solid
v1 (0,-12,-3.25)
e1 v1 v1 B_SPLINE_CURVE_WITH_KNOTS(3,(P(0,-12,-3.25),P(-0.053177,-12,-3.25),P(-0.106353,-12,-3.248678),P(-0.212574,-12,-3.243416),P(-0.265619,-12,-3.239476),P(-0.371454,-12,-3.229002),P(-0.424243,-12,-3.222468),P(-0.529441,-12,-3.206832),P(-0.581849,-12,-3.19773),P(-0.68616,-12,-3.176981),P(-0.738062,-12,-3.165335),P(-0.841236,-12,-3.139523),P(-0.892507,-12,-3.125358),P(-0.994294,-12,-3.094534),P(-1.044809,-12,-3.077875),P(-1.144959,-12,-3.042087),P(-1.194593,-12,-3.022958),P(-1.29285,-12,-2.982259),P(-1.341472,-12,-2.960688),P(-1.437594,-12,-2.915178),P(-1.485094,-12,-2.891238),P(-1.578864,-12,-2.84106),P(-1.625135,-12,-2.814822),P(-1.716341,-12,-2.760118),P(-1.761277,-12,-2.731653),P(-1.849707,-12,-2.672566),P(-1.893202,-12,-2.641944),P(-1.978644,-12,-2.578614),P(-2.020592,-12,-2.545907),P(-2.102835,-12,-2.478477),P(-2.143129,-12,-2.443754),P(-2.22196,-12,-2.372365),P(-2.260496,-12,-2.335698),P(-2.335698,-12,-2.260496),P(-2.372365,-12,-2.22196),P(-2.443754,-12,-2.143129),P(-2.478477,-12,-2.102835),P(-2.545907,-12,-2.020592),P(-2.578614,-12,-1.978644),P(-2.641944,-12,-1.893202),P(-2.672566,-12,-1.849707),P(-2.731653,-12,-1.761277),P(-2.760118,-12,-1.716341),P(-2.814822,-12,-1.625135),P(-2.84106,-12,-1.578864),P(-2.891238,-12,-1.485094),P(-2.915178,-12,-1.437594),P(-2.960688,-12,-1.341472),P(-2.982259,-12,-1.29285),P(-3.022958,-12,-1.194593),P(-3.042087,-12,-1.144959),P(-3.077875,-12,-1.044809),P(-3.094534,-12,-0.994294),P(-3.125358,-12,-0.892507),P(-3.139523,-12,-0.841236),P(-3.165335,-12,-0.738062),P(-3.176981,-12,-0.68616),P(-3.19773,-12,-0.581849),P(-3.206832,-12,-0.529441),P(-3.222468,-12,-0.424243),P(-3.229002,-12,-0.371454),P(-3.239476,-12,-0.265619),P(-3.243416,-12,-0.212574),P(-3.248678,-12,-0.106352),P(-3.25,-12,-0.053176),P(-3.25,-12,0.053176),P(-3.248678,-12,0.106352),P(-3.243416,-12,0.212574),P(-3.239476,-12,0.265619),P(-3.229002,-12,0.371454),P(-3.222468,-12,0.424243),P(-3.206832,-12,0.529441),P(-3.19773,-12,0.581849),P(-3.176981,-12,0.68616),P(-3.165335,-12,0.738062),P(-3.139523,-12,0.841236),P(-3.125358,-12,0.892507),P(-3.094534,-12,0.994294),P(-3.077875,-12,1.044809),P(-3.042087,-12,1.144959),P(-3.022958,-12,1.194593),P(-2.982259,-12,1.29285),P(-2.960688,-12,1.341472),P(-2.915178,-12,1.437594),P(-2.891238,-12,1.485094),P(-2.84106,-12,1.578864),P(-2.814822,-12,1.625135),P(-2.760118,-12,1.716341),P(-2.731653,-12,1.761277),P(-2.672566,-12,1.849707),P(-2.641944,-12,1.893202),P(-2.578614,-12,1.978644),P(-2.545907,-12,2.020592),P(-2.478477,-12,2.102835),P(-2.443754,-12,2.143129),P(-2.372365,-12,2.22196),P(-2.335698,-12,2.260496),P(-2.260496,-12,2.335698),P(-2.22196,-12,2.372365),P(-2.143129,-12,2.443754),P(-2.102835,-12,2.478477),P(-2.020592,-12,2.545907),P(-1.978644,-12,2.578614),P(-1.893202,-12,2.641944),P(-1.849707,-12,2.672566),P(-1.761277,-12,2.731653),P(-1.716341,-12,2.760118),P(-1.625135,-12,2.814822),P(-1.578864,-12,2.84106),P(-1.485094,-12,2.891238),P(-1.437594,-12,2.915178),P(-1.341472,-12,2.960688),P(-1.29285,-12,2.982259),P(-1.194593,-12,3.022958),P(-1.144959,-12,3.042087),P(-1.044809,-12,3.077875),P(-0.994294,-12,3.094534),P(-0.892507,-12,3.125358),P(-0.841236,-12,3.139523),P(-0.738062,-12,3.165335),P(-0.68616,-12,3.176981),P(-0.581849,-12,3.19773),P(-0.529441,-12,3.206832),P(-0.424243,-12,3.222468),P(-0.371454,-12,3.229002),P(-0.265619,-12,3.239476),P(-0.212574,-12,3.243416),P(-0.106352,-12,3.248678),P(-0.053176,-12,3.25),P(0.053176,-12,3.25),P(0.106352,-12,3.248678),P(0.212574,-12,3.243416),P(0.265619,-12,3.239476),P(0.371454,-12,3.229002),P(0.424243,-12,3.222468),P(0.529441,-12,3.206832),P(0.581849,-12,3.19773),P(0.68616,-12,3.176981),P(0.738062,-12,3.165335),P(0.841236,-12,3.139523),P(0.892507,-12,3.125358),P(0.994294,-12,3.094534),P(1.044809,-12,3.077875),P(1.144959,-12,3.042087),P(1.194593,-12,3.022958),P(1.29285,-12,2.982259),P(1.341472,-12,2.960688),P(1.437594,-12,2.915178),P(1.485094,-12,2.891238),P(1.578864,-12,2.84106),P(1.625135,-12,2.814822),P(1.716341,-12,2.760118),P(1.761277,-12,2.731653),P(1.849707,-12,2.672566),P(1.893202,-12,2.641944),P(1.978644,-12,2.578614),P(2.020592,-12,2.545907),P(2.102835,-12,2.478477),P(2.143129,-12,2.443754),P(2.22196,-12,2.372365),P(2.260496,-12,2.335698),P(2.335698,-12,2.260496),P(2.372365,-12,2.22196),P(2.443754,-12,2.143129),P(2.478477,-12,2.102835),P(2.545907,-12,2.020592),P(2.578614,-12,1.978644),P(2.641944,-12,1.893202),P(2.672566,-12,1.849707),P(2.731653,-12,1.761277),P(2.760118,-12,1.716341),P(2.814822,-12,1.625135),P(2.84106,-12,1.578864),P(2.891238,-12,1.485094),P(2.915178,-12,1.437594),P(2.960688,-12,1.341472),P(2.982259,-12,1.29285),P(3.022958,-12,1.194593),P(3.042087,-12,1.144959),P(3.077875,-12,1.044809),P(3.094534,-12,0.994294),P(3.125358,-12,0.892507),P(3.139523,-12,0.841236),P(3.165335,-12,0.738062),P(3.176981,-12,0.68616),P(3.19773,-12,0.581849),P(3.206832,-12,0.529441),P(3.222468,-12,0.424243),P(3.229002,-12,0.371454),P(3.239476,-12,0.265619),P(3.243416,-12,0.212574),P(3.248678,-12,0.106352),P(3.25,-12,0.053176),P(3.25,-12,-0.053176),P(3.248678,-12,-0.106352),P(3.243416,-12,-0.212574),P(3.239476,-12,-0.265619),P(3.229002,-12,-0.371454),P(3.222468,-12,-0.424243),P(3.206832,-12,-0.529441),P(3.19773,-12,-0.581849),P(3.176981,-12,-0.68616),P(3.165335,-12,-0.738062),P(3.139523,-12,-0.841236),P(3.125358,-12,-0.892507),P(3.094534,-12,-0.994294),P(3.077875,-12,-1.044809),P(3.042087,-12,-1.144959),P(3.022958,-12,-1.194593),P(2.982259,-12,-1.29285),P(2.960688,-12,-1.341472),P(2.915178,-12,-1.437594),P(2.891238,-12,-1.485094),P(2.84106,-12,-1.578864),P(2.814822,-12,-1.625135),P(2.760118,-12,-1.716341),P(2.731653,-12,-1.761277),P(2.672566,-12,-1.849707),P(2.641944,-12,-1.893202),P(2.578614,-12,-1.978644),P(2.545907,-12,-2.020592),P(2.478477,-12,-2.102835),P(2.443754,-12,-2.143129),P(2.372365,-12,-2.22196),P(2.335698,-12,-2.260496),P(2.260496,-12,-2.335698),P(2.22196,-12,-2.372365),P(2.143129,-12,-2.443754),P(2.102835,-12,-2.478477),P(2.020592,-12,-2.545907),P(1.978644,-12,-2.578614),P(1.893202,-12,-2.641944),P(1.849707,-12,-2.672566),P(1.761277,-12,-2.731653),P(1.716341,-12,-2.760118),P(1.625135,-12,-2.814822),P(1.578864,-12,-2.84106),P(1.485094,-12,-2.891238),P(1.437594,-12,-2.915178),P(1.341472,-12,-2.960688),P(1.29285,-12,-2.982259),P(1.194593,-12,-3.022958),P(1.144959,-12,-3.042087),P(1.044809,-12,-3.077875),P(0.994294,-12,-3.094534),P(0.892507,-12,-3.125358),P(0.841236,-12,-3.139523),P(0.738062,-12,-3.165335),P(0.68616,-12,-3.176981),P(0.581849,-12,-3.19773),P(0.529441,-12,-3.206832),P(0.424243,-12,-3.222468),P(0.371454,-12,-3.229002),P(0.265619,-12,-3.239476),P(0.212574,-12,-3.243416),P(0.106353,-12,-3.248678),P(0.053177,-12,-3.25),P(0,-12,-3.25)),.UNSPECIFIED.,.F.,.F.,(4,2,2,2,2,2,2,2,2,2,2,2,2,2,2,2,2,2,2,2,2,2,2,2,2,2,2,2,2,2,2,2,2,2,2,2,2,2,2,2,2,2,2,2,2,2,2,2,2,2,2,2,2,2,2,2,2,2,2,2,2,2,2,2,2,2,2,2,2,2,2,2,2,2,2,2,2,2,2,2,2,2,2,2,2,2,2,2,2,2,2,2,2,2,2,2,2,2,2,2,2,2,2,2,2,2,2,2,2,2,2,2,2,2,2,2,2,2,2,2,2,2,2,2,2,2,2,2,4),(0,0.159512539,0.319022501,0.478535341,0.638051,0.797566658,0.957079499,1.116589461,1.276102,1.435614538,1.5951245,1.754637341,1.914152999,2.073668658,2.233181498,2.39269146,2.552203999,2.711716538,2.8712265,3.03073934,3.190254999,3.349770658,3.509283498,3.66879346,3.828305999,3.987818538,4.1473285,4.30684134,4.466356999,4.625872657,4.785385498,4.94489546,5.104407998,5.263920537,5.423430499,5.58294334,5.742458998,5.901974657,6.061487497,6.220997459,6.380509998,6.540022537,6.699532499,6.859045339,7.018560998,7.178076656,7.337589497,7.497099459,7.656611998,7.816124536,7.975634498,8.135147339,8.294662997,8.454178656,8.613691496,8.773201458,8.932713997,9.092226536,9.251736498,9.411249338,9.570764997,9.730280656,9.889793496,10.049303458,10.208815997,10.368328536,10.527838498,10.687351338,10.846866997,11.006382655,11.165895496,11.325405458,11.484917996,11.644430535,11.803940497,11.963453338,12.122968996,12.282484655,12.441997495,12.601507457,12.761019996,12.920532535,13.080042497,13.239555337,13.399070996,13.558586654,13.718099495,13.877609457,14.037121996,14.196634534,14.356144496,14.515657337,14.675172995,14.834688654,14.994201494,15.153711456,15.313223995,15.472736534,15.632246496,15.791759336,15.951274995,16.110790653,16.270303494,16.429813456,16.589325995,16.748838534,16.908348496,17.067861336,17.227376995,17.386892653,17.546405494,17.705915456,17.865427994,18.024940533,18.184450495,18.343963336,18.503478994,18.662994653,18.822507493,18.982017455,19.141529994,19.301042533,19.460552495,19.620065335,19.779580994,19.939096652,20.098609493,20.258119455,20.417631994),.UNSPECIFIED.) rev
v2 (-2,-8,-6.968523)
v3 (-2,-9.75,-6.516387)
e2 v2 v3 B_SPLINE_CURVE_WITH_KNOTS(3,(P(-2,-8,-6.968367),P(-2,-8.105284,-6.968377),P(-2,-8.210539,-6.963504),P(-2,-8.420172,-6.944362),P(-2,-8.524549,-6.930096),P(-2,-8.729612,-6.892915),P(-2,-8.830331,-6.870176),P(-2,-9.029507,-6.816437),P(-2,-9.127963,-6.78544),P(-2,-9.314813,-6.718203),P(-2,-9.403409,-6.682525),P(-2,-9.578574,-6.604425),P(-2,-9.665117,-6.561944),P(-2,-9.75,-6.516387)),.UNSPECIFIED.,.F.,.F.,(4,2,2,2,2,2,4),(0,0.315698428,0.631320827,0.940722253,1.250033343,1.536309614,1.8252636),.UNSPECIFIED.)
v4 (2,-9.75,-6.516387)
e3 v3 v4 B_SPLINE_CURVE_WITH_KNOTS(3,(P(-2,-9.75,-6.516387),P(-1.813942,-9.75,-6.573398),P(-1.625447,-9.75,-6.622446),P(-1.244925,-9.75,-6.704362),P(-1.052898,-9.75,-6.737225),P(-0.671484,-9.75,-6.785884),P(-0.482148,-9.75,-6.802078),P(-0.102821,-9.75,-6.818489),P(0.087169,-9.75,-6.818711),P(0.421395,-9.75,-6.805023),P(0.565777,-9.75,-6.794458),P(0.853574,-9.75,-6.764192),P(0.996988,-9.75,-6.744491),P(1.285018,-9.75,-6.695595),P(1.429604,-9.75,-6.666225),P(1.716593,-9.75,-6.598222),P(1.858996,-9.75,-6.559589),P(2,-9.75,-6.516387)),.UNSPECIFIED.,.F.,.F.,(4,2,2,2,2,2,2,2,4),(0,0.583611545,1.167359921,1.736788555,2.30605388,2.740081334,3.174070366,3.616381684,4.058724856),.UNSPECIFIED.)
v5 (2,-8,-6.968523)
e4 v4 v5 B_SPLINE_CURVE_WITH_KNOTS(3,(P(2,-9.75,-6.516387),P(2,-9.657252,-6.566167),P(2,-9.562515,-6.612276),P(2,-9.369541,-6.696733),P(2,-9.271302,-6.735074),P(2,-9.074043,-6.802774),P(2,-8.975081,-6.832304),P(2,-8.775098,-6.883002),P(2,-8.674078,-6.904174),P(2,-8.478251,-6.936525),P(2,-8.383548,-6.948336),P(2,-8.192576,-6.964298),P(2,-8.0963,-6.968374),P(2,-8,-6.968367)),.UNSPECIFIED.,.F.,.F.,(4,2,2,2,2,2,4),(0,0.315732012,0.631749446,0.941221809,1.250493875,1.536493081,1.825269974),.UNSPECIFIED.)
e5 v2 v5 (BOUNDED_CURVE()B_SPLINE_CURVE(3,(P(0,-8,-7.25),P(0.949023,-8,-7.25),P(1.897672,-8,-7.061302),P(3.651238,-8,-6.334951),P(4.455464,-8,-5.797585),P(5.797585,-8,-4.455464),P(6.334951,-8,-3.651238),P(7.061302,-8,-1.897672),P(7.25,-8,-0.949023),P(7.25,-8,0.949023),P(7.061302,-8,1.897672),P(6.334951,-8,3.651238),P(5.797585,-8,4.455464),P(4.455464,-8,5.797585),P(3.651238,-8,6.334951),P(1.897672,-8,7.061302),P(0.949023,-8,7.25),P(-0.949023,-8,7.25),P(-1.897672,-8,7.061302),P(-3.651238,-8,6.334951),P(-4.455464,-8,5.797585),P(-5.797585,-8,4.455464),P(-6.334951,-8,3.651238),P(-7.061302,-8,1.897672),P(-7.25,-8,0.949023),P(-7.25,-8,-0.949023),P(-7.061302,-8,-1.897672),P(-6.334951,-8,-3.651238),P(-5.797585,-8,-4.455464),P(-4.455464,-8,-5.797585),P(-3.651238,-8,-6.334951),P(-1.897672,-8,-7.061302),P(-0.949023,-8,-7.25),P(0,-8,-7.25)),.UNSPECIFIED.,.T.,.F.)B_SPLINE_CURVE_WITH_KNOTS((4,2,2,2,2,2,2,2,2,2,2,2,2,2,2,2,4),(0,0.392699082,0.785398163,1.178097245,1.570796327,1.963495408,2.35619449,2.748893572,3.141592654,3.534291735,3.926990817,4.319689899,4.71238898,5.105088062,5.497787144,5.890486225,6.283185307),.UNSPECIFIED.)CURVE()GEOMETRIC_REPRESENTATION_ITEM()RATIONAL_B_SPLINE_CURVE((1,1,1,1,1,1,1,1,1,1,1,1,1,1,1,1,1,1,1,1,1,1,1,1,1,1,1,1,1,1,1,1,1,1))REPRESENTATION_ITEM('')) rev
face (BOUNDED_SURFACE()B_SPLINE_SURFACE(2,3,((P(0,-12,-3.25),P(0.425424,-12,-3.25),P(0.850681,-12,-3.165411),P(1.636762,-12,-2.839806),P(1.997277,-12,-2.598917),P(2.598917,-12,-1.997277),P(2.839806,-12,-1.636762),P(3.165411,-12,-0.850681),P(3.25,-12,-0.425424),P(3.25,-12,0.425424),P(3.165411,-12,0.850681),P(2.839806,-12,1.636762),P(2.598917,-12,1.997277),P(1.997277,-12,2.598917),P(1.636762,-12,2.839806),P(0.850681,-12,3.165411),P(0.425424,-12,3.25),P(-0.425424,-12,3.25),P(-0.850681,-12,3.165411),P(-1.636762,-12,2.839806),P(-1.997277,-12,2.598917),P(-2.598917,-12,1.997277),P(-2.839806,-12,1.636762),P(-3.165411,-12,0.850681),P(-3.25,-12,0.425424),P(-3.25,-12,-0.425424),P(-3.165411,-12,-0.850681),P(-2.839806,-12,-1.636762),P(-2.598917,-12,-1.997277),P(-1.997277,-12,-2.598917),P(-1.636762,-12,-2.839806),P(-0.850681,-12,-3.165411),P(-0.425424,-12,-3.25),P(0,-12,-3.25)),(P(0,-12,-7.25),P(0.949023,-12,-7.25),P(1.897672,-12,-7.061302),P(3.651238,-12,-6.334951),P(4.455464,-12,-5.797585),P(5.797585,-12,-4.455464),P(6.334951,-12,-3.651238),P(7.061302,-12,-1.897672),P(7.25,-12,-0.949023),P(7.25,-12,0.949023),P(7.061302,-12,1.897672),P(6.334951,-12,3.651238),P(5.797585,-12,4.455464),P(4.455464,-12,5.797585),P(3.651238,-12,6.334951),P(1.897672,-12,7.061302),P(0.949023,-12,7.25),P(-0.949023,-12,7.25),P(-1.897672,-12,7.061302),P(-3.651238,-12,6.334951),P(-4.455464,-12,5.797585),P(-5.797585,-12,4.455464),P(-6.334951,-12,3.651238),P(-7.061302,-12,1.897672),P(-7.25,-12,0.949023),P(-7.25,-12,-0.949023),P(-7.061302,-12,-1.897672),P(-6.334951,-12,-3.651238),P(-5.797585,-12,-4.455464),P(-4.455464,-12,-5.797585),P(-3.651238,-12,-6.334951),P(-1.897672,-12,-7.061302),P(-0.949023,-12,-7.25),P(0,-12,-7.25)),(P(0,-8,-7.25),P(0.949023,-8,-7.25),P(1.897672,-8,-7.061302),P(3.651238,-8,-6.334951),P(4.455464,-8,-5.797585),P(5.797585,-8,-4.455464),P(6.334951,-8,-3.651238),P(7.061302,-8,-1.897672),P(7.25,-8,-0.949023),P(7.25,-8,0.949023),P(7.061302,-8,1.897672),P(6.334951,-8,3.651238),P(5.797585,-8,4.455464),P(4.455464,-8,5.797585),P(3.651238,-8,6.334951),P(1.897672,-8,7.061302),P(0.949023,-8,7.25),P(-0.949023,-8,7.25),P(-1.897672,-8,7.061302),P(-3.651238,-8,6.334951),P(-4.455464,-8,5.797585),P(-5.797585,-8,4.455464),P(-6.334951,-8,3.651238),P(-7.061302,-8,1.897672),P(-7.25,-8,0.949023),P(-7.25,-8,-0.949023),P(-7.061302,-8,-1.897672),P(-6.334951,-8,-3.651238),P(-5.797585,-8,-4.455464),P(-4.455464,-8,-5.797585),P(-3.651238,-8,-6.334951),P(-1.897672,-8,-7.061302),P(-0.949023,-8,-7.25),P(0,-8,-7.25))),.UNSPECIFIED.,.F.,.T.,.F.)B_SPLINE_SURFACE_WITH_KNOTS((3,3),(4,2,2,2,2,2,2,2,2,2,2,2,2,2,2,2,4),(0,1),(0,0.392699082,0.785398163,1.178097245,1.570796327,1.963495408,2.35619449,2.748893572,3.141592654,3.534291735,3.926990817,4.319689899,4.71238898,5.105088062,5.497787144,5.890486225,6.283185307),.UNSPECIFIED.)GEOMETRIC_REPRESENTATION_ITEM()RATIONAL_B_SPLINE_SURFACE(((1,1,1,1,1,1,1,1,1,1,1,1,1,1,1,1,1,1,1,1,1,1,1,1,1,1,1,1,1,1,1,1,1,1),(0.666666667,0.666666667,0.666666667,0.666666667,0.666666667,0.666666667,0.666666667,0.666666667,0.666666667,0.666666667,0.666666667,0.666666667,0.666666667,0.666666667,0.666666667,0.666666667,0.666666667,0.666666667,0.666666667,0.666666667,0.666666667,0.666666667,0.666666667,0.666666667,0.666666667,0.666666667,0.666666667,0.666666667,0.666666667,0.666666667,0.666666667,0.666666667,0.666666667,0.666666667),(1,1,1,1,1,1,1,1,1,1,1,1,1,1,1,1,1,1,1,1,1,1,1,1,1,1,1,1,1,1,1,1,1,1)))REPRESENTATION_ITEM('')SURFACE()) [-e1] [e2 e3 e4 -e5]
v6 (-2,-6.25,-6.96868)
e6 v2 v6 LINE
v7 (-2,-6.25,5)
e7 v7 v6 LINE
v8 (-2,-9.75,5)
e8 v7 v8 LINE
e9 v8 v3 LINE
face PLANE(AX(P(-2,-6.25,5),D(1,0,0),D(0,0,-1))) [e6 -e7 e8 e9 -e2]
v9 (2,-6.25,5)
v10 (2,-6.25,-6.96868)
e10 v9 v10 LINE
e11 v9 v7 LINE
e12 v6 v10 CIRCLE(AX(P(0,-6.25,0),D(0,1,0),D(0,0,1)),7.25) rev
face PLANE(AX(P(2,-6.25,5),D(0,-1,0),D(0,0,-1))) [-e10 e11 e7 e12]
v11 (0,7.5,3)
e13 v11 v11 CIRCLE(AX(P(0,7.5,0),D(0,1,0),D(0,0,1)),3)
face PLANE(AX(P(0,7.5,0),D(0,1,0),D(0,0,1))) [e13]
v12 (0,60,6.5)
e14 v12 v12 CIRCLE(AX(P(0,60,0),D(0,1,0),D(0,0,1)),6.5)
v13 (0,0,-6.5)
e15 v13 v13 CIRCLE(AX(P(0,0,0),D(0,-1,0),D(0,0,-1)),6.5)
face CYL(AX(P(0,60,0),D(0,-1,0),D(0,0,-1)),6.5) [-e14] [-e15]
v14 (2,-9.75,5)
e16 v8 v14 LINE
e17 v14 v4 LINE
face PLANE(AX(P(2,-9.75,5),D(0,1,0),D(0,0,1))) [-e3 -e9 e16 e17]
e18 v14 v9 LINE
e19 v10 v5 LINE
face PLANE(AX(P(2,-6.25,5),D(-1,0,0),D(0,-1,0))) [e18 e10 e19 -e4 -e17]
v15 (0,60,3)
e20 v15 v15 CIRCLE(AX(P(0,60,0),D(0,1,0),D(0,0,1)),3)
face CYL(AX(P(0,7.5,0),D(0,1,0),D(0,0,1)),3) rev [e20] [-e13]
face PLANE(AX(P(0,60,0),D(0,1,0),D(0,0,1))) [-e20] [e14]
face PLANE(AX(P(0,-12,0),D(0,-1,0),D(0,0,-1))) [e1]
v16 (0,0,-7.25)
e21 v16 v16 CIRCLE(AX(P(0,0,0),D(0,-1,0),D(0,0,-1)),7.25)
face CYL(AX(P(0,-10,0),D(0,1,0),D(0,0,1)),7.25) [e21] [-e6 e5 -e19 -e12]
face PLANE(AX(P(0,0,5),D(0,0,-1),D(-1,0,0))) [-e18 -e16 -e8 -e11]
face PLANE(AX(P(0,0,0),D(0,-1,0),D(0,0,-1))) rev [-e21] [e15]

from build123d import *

# Parameters (mm, degrees)
SKETCH1_R                      = 6.5
BOSS_EXTRUDE1_DEPTH            = 60
SKETCH2_R                      = 3
INNER_CHAMBER_DEPTH            = 52.5
SKETCH4_R                      = 7.25
BOSS_EXTRUDE2_DEPTH            = 10
SKETCH5_R                      = 7.25
BOSS_EXTRUDE3_DEPTH            = 2
FILLET3_SIZE                   = 4
CUT_EXTRUDE2_REACH             = 62.87
SKETCH6_W                      = 4
SKETCH6_H                      = 3.5
CUT_EXTRUDE2_DIRECTION_2_DEPTH = 5


with BuildPart() as part:
    # Sketch1 → Boss-Extrude1 (new body)
    with BuildSketch(Plane(origin=(0, 0, 0), x_dir=(1, 0, 0), z_dir=(0, 1, 0))):
        with Locations(Location((0, 0, 0), (0, 0, 270))):
            Circle(SKETCH1_R)
    extrude(amount=BOSS_EXTRUDE1_DEPTH)

    # Sketch2 → Inner Chamber (cut)
    with BuildSketch(Plane(origin=(0, 60, 0), x_dir=(1, 0, 0), z_dir=(0, 1, 0))):
        with Locations(Location((0, 0, 0), (0, 0, 270))):
            Circle(SKETCH2_R)
    extrude(amount=-INNER_CHAMBER_DEPTH, mode=Mode.SUBTRACT)

    # Sketch4 → Boss-Extrude2 (add)
    with BuildSketch(Plane.XZ):
        with Locations(Location((0, 0, 0), (0, 0, 270))):
            Circle(SKETCH4_R)
    extrude(amount=BOSS_EXTRUDE2_DEPTH)

    # Sketch5 → Boss-Extrude3 (add)
    with BuildSketch(Plane.XZ.offset(10)):
        with Locations(Location((0, 0, 0), (0, 0, 270))):
            Circle(SKETCH5_R)
    extrude(amount=BOSS_EXTRUDE3_DEPTH)

    # Fillet3
    # a fillet whose section is not a circle: 4 mm, written as the material it takes off along each edge
    with BuildSketch(Plane(origin=(0, -12, 0), x_dir=(0, 0, -1), z_dir=(-1, 0, 0))) as fillet3_piece_1:
        with BuildLine():
            Bezier((7.25, -FILLET3_SIZE), (7.25, 0), (7.25 - FILLET3_SIZE, 0), weights=[1, 0.666666667, 1])
            Line((7.25 - FILLET3_SIZE, 0), (7.25, 0))
            Line((7.25, 0), (7.25, -FILLET3_SIZE))
        make_face()
    revolve(axis=Axis((0, -12, 0), (0, -1, 0)), mode=Mode.SUBTRACT)

    # Sketch6 → Cut-Extrude2 (cut, up to next)
    with BuildSketch(Plane.XY, mode=Mode.PRIVATE) as cut_extrude2_sk1:
        with Locations((0, -8)):
            Rectangle(SKETCH6_W, SKETCH6_H)
    cut_extrude2_tool1 = extrude(cut_extrude2_sk1.sketch, amount=-CUT_EXTRUDE2_REACH, mode=Mode.PRIVATE) & part.part
    add(cut_extrude2_tool1.solids().sort_by_distance((0, -8, 0))[0], mode=Mode.SUBTRACT)

    # Sketch6 → Cut-Extrude2 direction 2 (cut)
    with BuildSketch(Plane.XY):
        with Locations((0, -8)):
            Rectangle(SKETCH6_W, SKETCH6_H)
    extrude(amount=CUT_EXTRUDE2_DIRECTION_2_DEPTH, mode=Mode.SUBTRACT)


solid = part.part
